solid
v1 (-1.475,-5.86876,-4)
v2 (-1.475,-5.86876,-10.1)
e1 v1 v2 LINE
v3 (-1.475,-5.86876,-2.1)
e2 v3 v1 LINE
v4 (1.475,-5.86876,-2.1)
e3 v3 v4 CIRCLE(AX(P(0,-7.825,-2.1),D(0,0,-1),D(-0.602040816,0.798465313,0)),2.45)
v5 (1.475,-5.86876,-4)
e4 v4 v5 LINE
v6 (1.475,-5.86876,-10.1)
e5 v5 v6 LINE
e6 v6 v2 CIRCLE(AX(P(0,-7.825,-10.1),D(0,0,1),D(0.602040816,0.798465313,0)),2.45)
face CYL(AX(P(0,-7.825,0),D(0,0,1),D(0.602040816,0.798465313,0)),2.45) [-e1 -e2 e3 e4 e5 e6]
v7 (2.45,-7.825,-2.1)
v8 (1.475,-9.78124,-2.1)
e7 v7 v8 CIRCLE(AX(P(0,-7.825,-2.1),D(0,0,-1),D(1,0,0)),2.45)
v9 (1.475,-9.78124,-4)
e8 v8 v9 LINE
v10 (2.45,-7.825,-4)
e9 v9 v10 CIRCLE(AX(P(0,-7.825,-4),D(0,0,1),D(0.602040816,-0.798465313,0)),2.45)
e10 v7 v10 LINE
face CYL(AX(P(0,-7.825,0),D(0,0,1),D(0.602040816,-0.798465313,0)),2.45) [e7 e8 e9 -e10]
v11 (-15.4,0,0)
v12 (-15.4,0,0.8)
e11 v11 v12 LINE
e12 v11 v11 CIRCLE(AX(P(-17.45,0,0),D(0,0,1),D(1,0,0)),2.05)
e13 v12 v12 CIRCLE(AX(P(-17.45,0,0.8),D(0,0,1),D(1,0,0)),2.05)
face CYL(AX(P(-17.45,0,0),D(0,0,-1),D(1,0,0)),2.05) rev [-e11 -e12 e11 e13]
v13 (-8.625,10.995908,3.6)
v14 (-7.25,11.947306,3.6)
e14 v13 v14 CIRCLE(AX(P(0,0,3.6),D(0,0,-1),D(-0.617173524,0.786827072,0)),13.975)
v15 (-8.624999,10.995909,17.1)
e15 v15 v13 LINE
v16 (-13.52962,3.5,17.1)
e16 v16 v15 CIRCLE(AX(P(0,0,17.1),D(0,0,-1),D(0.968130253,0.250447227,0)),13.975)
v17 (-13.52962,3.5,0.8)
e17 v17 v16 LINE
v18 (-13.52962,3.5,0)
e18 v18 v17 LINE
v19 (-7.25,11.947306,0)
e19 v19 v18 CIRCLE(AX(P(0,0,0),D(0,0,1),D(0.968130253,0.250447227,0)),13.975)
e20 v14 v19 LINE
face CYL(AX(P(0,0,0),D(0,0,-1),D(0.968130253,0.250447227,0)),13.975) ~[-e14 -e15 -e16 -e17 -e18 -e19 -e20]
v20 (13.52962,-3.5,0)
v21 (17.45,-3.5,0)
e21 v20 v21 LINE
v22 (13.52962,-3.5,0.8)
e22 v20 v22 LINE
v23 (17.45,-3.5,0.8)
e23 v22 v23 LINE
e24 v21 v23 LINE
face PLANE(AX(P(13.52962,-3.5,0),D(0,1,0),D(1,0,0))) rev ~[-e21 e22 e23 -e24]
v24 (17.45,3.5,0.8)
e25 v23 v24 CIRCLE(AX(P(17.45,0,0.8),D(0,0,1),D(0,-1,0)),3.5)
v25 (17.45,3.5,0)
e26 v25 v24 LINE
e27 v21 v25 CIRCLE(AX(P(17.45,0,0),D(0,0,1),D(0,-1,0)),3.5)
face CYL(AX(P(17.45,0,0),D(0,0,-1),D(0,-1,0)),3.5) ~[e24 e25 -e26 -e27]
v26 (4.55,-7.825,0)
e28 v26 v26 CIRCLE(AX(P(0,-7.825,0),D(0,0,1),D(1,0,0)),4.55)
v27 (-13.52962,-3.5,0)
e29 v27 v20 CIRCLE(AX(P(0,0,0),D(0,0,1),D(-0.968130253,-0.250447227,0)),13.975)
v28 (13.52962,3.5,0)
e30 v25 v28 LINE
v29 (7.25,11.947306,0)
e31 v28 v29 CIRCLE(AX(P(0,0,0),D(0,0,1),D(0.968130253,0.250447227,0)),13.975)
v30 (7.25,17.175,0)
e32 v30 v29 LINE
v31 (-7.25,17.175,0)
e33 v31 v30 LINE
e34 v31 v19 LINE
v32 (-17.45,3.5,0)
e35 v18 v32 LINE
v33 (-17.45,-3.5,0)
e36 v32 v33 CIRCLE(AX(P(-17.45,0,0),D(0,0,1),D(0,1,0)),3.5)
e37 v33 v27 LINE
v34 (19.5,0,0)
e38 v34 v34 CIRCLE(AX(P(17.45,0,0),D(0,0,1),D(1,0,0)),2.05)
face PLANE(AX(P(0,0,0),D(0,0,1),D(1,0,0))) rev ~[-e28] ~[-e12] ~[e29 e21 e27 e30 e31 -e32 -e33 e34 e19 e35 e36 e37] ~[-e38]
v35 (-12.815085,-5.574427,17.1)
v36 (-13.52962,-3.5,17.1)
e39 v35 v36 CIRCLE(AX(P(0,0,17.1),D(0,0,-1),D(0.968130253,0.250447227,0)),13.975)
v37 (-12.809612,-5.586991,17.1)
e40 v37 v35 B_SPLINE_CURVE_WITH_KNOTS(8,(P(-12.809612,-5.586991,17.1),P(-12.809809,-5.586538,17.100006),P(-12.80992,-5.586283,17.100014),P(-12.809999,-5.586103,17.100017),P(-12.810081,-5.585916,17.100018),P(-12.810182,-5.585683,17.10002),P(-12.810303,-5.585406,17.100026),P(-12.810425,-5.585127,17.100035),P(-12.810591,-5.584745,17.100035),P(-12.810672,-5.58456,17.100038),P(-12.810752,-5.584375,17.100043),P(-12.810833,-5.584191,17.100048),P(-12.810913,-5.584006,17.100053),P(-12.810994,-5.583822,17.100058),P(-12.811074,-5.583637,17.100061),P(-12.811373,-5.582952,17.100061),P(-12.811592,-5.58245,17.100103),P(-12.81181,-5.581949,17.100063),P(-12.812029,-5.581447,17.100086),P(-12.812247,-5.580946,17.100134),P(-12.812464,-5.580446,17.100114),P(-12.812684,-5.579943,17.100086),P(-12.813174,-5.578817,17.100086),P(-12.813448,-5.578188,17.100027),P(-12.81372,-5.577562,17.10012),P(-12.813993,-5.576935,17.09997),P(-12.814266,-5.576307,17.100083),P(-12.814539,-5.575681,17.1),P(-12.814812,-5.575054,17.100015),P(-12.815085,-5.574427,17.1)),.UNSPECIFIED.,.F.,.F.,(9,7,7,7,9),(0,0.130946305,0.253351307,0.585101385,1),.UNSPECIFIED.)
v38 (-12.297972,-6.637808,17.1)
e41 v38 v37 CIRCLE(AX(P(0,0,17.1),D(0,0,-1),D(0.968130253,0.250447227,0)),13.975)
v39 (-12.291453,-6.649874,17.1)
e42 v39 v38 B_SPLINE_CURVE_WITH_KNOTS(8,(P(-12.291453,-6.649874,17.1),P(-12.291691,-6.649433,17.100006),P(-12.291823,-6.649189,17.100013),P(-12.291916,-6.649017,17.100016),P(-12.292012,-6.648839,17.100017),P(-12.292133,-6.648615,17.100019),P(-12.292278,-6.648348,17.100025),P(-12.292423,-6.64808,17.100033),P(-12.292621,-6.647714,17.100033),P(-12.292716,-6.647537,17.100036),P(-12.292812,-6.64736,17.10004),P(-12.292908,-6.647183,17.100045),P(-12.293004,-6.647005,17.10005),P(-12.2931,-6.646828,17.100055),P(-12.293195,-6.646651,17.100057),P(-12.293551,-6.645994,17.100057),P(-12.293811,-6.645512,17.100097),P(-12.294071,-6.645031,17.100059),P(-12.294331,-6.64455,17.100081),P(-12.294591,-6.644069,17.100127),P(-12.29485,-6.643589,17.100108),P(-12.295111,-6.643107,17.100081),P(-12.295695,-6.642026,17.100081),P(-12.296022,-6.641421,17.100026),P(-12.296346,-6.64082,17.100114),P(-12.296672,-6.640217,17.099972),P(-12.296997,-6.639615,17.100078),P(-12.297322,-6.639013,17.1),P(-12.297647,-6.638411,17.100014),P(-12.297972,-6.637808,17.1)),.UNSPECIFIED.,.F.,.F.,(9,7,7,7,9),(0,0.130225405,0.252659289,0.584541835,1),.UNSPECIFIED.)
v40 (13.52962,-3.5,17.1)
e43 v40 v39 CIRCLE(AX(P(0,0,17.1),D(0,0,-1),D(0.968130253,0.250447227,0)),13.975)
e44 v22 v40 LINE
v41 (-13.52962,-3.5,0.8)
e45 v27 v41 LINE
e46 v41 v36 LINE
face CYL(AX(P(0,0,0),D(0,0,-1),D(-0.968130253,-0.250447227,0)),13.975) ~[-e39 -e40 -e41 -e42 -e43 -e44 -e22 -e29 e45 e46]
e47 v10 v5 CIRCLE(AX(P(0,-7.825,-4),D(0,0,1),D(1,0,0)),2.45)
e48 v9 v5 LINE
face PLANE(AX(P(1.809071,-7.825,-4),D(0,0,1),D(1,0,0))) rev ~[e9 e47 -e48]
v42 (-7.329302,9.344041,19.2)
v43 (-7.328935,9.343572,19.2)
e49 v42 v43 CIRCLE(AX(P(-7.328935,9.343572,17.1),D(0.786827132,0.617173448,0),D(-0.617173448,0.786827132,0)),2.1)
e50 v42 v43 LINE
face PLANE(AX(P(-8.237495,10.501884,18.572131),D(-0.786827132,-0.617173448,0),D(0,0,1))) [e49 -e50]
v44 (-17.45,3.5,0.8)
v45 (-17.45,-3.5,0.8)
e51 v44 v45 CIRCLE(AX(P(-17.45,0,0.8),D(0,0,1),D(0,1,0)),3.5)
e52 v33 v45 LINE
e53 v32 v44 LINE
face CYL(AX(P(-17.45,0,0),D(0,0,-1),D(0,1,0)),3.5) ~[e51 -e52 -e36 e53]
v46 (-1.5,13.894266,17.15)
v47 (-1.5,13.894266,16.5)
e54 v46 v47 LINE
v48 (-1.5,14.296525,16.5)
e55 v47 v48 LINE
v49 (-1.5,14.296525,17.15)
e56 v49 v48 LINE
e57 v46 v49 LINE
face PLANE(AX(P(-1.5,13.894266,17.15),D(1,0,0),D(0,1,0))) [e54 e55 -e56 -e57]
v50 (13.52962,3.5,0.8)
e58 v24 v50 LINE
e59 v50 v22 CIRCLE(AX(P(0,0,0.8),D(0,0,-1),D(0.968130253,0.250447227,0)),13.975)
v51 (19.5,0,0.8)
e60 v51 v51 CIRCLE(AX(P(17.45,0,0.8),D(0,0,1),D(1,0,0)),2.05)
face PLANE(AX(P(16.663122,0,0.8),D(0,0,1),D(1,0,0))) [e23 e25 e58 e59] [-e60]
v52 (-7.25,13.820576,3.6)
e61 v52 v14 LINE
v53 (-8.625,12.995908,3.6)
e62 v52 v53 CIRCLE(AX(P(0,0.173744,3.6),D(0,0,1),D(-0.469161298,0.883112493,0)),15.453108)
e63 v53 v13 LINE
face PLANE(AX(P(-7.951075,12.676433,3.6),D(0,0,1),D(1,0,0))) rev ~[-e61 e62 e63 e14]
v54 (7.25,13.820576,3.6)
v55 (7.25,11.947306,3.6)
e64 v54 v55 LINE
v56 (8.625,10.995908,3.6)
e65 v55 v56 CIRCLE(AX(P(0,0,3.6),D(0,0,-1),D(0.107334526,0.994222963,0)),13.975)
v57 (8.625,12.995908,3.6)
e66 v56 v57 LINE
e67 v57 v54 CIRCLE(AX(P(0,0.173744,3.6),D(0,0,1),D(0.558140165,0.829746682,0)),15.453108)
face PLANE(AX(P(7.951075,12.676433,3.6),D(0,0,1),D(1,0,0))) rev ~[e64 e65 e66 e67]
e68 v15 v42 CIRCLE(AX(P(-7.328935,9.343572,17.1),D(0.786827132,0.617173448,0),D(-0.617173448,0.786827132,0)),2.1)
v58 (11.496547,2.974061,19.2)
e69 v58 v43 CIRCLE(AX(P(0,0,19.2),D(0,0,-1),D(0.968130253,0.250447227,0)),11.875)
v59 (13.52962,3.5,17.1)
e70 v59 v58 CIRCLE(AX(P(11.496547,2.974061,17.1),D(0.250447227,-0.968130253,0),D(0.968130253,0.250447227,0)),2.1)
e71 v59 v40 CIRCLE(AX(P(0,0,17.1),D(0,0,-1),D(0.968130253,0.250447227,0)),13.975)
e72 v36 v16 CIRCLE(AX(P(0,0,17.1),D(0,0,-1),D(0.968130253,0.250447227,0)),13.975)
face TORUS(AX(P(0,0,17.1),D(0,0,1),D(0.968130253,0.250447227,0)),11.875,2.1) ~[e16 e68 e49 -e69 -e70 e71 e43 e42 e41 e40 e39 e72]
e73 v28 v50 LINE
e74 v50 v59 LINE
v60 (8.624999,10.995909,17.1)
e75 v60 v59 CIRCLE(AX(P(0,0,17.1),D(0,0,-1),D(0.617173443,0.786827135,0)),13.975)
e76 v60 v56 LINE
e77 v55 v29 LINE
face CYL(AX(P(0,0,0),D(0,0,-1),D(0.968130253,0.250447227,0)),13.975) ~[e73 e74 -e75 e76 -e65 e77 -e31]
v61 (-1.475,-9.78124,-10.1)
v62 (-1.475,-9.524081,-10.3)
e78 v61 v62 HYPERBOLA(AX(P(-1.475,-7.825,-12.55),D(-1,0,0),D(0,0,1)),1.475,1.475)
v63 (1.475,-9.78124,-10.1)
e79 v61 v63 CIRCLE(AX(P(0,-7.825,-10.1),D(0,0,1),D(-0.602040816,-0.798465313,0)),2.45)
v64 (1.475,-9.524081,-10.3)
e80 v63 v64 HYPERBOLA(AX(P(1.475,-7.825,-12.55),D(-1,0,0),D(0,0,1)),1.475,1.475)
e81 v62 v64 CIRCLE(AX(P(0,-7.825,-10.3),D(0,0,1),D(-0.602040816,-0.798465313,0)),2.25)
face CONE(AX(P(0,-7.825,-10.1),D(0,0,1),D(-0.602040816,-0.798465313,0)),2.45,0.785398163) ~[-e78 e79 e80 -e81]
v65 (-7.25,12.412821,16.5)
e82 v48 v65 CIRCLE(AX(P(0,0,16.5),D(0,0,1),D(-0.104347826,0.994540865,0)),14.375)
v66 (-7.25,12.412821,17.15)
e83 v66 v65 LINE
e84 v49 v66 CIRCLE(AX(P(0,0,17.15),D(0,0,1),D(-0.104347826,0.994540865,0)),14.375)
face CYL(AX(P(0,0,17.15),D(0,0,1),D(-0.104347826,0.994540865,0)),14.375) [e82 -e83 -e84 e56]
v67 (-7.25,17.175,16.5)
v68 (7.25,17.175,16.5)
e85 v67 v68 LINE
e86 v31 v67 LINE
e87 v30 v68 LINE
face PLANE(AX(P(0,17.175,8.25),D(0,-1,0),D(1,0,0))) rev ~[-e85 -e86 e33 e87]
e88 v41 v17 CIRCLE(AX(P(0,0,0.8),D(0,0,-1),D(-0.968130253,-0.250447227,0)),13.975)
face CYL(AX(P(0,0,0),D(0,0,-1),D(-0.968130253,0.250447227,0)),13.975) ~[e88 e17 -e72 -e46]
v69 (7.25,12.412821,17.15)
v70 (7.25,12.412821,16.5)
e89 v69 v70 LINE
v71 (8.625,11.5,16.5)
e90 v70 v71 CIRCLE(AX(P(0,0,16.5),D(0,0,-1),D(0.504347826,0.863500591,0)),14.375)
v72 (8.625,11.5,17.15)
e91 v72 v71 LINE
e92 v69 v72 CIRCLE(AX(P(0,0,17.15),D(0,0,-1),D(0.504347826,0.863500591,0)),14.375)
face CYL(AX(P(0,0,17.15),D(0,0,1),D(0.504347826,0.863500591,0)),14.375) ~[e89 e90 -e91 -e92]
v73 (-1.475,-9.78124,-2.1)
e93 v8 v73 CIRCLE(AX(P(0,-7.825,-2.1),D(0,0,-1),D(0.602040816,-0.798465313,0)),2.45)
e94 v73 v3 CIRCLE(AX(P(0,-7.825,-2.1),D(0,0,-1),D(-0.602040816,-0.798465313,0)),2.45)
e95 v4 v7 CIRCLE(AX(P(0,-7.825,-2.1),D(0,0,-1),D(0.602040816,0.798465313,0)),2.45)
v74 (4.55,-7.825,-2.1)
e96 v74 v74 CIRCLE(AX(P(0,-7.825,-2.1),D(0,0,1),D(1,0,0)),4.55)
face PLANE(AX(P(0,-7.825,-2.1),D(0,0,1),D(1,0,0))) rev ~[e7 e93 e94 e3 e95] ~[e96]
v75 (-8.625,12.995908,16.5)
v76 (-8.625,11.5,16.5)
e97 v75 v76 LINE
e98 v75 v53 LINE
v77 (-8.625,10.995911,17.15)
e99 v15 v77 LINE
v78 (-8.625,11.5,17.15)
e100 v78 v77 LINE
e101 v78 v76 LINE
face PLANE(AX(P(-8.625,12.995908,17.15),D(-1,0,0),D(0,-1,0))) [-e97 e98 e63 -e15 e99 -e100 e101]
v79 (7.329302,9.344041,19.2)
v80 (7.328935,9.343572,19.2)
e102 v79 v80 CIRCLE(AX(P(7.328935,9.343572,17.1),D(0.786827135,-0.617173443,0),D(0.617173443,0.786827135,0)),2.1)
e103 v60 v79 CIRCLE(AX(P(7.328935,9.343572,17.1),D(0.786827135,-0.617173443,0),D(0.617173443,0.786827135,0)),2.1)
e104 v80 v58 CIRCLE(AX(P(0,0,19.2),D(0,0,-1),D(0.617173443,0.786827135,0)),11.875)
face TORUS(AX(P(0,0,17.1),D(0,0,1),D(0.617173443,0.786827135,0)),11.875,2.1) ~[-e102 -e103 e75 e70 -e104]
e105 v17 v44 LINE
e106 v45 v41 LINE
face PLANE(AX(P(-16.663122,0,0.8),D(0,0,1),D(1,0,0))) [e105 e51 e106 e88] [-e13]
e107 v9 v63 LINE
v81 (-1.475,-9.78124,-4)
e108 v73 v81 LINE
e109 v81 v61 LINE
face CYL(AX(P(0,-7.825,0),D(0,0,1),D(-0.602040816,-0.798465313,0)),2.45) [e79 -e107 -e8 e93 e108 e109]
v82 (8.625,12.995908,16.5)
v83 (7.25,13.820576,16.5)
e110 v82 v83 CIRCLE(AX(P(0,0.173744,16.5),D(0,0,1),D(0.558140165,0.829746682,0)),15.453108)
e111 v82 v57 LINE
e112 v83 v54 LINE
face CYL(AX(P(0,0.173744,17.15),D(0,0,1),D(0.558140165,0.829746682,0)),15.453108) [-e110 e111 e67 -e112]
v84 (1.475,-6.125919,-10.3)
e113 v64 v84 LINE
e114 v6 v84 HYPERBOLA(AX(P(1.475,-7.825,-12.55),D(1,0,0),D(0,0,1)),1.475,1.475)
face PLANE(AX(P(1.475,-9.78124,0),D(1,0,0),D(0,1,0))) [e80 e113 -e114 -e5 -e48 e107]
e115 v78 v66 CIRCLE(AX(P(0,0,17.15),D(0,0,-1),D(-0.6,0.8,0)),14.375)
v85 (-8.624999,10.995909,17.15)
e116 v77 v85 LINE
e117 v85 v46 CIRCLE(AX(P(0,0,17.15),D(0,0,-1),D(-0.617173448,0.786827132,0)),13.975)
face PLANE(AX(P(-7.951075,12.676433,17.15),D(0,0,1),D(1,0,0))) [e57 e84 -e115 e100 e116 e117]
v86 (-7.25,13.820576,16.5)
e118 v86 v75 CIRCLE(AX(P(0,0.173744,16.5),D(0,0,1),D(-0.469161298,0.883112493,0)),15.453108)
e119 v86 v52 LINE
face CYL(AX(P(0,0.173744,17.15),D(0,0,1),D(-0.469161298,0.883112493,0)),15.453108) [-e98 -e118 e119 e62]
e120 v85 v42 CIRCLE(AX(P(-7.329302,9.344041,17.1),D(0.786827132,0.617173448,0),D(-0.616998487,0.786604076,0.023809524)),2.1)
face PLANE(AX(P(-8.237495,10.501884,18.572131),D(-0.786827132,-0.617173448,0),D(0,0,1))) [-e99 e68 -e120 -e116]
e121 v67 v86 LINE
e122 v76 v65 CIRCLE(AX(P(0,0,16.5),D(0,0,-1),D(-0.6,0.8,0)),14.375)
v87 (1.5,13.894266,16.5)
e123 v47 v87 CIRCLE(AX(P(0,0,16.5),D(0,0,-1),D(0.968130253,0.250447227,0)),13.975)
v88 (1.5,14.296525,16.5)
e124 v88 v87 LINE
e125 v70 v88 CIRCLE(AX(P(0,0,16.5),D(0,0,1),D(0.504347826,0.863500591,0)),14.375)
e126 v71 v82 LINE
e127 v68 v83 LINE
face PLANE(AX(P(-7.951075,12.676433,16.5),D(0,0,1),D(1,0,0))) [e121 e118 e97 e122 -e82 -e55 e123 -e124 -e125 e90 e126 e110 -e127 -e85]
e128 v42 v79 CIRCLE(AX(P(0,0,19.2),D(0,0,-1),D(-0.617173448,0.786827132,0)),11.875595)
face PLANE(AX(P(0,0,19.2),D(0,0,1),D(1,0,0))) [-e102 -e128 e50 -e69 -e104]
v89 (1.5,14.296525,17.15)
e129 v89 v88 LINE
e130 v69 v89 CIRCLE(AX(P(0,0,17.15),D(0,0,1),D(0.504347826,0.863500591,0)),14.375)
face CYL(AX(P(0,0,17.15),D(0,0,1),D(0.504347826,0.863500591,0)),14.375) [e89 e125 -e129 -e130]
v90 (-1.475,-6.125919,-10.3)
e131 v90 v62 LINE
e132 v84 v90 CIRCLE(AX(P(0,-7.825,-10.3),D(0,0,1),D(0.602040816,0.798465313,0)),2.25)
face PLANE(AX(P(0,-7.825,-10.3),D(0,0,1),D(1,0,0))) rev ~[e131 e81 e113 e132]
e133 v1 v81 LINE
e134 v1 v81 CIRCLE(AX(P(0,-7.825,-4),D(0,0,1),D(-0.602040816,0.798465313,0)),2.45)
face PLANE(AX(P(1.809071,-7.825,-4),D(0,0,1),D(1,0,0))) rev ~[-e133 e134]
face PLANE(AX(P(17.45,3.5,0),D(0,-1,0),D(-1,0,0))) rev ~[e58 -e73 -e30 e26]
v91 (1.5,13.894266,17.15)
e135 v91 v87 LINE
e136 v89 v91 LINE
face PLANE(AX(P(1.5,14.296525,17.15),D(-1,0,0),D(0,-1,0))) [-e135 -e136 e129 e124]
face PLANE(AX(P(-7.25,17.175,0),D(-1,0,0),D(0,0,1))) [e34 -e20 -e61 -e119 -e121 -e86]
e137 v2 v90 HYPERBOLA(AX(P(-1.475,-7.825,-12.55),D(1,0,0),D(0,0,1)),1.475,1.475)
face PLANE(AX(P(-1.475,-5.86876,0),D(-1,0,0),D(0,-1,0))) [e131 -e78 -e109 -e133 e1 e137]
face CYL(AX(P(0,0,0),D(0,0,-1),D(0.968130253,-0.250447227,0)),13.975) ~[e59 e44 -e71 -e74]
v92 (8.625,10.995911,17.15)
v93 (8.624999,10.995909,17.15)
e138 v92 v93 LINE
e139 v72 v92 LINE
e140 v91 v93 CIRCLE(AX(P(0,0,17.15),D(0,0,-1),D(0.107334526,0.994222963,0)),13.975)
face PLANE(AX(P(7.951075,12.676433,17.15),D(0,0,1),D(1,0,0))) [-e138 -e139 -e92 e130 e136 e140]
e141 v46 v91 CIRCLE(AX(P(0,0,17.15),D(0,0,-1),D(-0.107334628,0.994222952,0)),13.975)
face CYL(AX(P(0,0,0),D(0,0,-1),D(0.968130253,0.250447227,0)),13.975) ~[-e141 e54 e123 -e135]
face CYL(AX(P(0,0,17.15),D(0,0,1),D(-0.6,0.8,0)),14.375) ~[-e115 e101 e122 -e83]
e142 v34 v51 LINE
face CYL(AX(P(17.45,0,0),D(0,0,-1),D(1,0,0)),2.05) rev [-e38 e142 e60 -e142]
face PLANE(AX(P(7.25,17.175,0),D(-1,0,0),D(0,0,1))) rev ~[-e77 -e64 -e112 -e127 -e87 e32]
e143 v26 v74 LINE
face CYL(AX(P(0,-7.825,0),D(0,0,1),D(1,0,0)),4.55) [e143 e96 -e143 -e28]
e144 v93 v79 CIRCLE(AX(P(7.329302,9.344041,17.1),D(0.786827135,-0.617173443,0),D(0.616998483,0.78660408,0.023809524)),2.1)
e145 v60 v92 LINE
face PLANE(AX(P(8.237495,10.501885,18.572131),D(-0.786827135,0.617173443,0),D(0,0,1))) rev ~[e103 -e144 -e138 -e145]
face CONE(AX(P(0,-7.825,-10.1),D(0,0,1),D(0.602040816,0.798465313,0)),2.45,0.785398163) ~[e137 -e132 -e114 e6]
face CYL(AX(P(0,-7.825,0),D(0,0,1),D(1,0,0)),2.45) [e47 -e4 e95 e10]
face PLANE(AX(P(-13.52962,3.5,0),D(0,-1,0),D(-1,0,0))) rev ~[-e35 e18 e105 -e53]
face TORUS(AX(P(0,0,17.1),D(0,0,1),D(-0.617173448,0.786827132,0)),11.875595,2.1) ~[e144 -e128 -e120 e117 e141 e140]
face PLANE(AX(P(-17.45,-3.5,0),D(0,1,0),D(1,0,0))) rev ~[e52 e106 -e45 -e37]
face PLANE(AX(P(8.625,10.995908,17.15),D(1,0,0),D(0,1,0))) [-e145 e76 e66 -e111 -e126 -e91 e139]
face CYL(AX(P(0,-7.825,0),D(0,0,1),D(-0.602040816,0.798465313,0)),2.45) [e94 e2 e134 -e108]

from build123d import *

# Parameters (mm, degrees)
F0_R         = 2.05
F1_DEPTH     = 0.8
F2_DEPTH     = 19.2
F3_R         = 4.55
F4_DEPTH     = 2.1
F5_DEPTH     = 4
F6_DEPTH     = 10.3
F8_W         = 14.5
F8_H         = 16.5
F12_DEPTH    = 13.55
F13_DEPTH    = 0.65
F14_T2_ANGLE = 246.3939611614
F14_T4_ANGLE = 31.9483260065
F14_T6_ANGLE = 44.2717080563
F14_T8_ANGLE = 37.3860047758
F15_SIZE     = 0.2


# Not quite as in the source:
# - a fillet or chamfer that OpenCascade refuses, or shapes differently, is made with other operations: its cross-section is extruded or revolved along the edge and cut away or added


with BuildPart() as f1:
    # F0 (on Top) → F1 (new body)
    with BuildSketch(Plane.XY):
        with BuildLine():
            ThreePointArc((-13.5296202829, -3.5), (-13.975, 0), (-13.5296202829, 3.5))
            Line((-13.5296202829, 3.5), (-17.45, 3.5))
            ThreePointArc((-17.45, 3.5), (-20.95, 0), (-17.45, -3.5))
            Line((-17.45, -3.5), (-13.5296202829, -3.5))
        make_face()
        with Locations((-17.45, 0)):
            Circle(F0_R, mode=Mode.SUBTRACT)
    extrude(amount=F1_DEPTH)



with BuildPart() as f1b:
    # F0 (on Top) → F1, piece 2 (new body)
    with BuildSketch(Plane.XY):
        with BuildLine():
            Line((17.45, 3.5), (13.5296202829, 3.5))
            ThreePointArc((13.5296202829, 3.5), (13.975, 0), (13.5296202829, -3.5))
            Line((13.5296202829, -3.5), (17.45, -3.5))
            ThreePointArc((17.45, -3.5), (20.95, 0), (17.45, 3.5))
        make_face()
        with Locations((17.45, 0)):
            Circle(F0_R, mode=Mode.SUBTRACT)
    extrude(amount=F1_DEPTH)


with BuildPart() as f1_1:
    add(f1.part)

    add(f1b.part)  # F2 merges F1b
    # F0 (on Top) → F2 (join)
    with BuildSketch(Plane.XY):
        with BuildLine():
            ThreePointArc((13.5296202829, -3.5), (13.975, 0), (13.5296202829, 3.5))
            ThreePointArc((13.5296202829, 3.5), (0, 13.975), (-13.5296202829, 3.5))
            ThreePointArc((-13.5296202829, 3.5), (-13.975, 0), (-13.5296202829, -3.5))
            ThreePointArc((-13.5296202829, -3.5), (0, -13.975), (13.5296202829, -3.5))
        make_face()
    extrude(amount=F2_DEPTH)

    # F3 (on Top) → F4 (join)
    with BuildSketch(Plane.XY):
        with Locations((0, -7.825)):
            Circle(F3_R)
        with BuildLine():
            ThreePointArc((1.475, -5.8687599841), (2.1927437151, -6.7321253503), (2.45, -7.825))
            ThreePointArc((2.45, -7.825), (2.1927437151, -8.9178746497), (1.475, -9.7812400159))
            ThreePointArc((1.475, -9.7812400159), (0, -10.275), (-1.475, -9.7812400159))
            ThreePointArc((-1.475, -9.7812400159), (-2.45, -7.825), (-1.475, -5.8687599841))
            ThreePointArc((-1.475, -5.8687599841), (0, -5.375), (1.475, -5.8687599841))
        make_face(mode=Mode.SUBTRACT)
    extrude(amount=-F4_DEPTH)

    # F3 (on Top) → F5 (join)
    with BuildSketch(Plane.XY):
        with BuildLine():
            ThreePointArc((1.475, -9.7812400159), (2.1927437151, -8.9178746497), (2.45, -7.825))
            ThreePointArc((2.45, -7.825), (2.1927437151, -6.7321253503), (1.475, -5.8687599841))
            Line((1.475, -5.8687599841), (1.475, -9.7812400159))
        make_face()
        with BuildLine():
            Line((1.475, -9.7812400159), (1.475, -5.8687599841))
            ThreePointArc((1.475, -5.8687599841), (0, -5.375), (-1.475, -5.8687599841))
            Line((-1.475, -5.8687599841), (-1.475, -9.7812400159))
            ThreePointArc((-1.475, -9.7812400159), (0, -10.275), (1.475, -9.7812400159))
        make_face()
        with BuildLine():
            Line((-1.475, -9.7812400159), (-1.475, -5.8687599841))
            ThreePointArc((-1.475, -5.8687599841), (-2.45, -7.825), (-1.475, -9.7812400159))
        make_face()
    extrude(amount=-F5_DEPTH)

    # F3 (on Top) → F6 (join)
    with BuildSketch(Plane.XY):
        with BuildLine():
            Line((1.475, -9.7812400159), (1.475, -5.8687599841))
            ThreePointArc((1.475, -5.8687599841), (0, -5.375), (-1.475, -5.8687599841))
            Line((-1.475, -5.8687599841), (-1.475, -9.7812400159))
            ThreePointArc((-1.475, -9.7812400159), (0, -10.275), (1.475, -9.7812400159))
        make_face()
    extrude(amount=-F6_DEPTH)

    # F8 (on offset) → F9 (join, up to the next surface of F1)
    with BuildSketch(Plane.XZ.offset(-17.175)):
        with Locations((0, 8.25)):
            Rectangle(F8_W, F8_H)
    extrude(until=Until.NEXT)

    # F11 (on offset) → F12 (join)
    with BuildSketch(Plane.XY.offset(17.15)):
        with BuildLine():
            Line((-8.625, 12.9959083299), (-8.625, 11.5))
            ThreePointArc((-8.625, 11.5), (-7.9506110955, 11.9761599943), (-7.25, 12.4128209928))
            Line((-7.25, 12.4128209928), (-7.25, 13.8205759578))
            ThreePointArc((-7.25, 13.8205759578), (-7.9482026537, 13.4260870893), (-8.625, 12.9959083299))
        make_face()
        with BuildLine():
            ThreePointArc((7.25, 12.4128209928), (7.9506110955, 11.9761599943), (8.625, 11.5))
            Line((8.625, 11.5), (8.625, 12.9959083299))
            ThreePointArc((8.625, 12.9959083299), (7.9482026537, 13.4260870893), (7.25, 13.8205759578))
            Line((7.25, 13.8205759578), (7.25, 12.4128209928))
        make_face()
        with BuildLine():
            Line((8.625, 10.9959083299), (8.625, 11.5))
            ThreePointArc((8.625, 11.5), (7.9506110955, 11.9761599943), (7.25, 12.4128209928))
            ThreePointArc((7.25, 12.4128209928), (4.4752329692, 13.6606337654), (1.5, 14.2965249274))
            Line((1.5, 14.2965249274), (1.5, 13.8942659036))
            ThreePointArc((1.5, 13.8942659036), (5.2658356798, 12.9449449436), (8.625, 10.9959083299))
        make_face()
        with BuildLine():
            Line((-8.625, 11.5), (-8.625, 10.9959083299))
            ThreePointArc((-8.625, 10.9959083299), (-5.2658356798, 12.9449449436), (-1.5, 13.8942659036))
            Line((-1.5, 13.8942659036), (-1.5, 14.2965249274))
            ThreePointArc((-1.5, 14.2965249274), (-4.4752329692, 13.6606337654), (-7.25, 12.4128209928))
            ThreePointArc((-7.25, 12.4128209928), (-7.9506110955, 11.9761599943), (-8.625, 11.5))
        make_face()
    extrude(amount=-F12_DEPTH)

    # F11 (on offset) → F13 (cut, through all)
    with BuildSketch(Plane.XY.offset(17.15)):
        with BuildLine():
            Line((-8.625, 12.9959083299), (-8.625, 11.5))
            ThreePointArc((-8.625, 11.5), (-7.9506110955, 11.9761599943), (-7.25, 12.4128209928))
            Line((-7.25, 12.4128209928), (-7.25, 13.8205759578))
            ThreePointArc((-7.25, 13.8205759578), (-7.9482026537, 13.4260870893), (-8.625, 12.9959083299))
        make_face()
        with BuildLine():
            ThreePointArc((7.25, 12.4128209928), (7.9506110955, 11.9761599943), (8.625, 11.5))
            Line((8.625, 11.5), (8.625, 12.9959083299))
            ThreePointArc((8.625, 12.9959083299), (7.9482026537, 13.4260870893), (7.25, 13.8205759578))
            Line((7.25, 13.8205759578), (7.25, 12.4128209928))
        make_face()
    extrude(amount=-F13_DEPTH, mode=Mode.SUBTRACT)

    # F14: fillet of radius 2.1 on 1 edges, made by hand

    # F14_s1 → F14_t2 (revolve, cut)
    with BuildSketch(Plane(origin=(0, 0, 0), x_dir=(0, 0, 1), z_dir=(-0.2504472272, 0.9681302528, 0))):
        with BuildLine():
            ThreePointArc((17.1, 13.975), (18.5849242405, 13.3599242405), (19.2, 11.875))
            Line((19.2, 11.875), (19.242, 11.875))
            Line((19.242, 11.875), (19.242, 14.017))
            Line((19.242, 14.017), (17.1, 14.017))
            Line((17.1, 14.017), (17.1, 13.975))
        make_face()
    revolve(axis=Axis((0, 0, 19.2), (0, 0, -1)), revolution_arc=F14_T2_ANGLE, mode=Mode.SUBTRACT)

    # F14_s3 → F14_t4 (revolve, cut)
    with BuildSketch(Plane(origin=(0, 0, 0), x_dir=(0, 0, 1), z_dir=(-0.7868271317, -0.617173448, 0))):
        with BuildLine():
            ThreePointArc((17.15, 13.975), (18.6024979201, 13.3427353976), (19.2, 11.8755953225))
            Line((19.2, 11.8755953225), (19.242, 11.8755953225))
            Line((19.242, 11.8755953225), (19.242, 13.975))
            Line((19.242, 13.975), (19.2, 14.017))
            ThreePointArc((19.2, 14.017), (18.175, 14.017), (17.151, 14.0169880936))
            Line((17.151, 14.0169880936), (17.15, 13.975))
        make_face()
    revolve(axis=Axis((0, 0, 19.2), (0, 0, -1)), revolution_arc=F14_T4_ANGLE, mode=Mode.SUBTRACT)

    # F14_s5 → F14_t6 (revolve, cut)
    with BuildSketch(Plane(origin=(0, 0, 0), x_dir=(0, 0, 1), z_dir=(-0.9942229517, -0.1073346275, 0))):
        with BuildLine():
            ThreePointArc((17.15, 13.975), (18.6024979201, 13.3427353976), (19.2, 11.8755953225))
            Line((19.2, 11.8755953225), (19.242, 11.8755953225))
            Line((19.242, 11.8755953225), (19.242, 13.975))
            Line((19.242, 13.975), (19.2, 14.017))
            ThreePointArc((19.2, 14.017), (18.175, 14.017), (17.151, 14.0169880936))
            Line((17.151, 14.0169880936), (17.15, 13.975))
        make_face()
    revolve(axis=Axis((0, 0, 19.2), (0, 0, -1)), revolution_arc=F14_T6_ANGLE, mode=Mode.SUBTRACT)

    # F14_s7 → F14_t8 (revolve, cut)
    with BuildSketch(Plane(origin=(0, 0, 0), x_dir=(0, 0, 1), z_dir=(-0.7868271352, 0.6171734435, 0))):
        with BuildLine():
            ThreePointArc((17.1, 13.975), (18.5849242405, 13.3599242405), (19.2, 11.875))
            Line((19.2, 11.875), (19.242, 11.875))
            Line((19.242, 11.875), (19.242, 14.017))
            Line((19.242, 14.017), (17.1, 14.017))
            Line((17.1, 14.017), (17.1, 13.975))
        make_face()
    revolve(axis=Axis((0, 0, 19.2), (0, 0, -1)), revolution_arc=F14_T8_ANGLE, mode=Mode.SUBTRACT)

    # F15
    f15_edges = [f1_1.edges().sort_by_distance(p)[0] for p in [
        (0, -5.375, -10.3),
        (0, -10.275, -10.3),
    ]]
    chamfer(f15_edges, length=F15_SIZE)


solid = f1_1.part
